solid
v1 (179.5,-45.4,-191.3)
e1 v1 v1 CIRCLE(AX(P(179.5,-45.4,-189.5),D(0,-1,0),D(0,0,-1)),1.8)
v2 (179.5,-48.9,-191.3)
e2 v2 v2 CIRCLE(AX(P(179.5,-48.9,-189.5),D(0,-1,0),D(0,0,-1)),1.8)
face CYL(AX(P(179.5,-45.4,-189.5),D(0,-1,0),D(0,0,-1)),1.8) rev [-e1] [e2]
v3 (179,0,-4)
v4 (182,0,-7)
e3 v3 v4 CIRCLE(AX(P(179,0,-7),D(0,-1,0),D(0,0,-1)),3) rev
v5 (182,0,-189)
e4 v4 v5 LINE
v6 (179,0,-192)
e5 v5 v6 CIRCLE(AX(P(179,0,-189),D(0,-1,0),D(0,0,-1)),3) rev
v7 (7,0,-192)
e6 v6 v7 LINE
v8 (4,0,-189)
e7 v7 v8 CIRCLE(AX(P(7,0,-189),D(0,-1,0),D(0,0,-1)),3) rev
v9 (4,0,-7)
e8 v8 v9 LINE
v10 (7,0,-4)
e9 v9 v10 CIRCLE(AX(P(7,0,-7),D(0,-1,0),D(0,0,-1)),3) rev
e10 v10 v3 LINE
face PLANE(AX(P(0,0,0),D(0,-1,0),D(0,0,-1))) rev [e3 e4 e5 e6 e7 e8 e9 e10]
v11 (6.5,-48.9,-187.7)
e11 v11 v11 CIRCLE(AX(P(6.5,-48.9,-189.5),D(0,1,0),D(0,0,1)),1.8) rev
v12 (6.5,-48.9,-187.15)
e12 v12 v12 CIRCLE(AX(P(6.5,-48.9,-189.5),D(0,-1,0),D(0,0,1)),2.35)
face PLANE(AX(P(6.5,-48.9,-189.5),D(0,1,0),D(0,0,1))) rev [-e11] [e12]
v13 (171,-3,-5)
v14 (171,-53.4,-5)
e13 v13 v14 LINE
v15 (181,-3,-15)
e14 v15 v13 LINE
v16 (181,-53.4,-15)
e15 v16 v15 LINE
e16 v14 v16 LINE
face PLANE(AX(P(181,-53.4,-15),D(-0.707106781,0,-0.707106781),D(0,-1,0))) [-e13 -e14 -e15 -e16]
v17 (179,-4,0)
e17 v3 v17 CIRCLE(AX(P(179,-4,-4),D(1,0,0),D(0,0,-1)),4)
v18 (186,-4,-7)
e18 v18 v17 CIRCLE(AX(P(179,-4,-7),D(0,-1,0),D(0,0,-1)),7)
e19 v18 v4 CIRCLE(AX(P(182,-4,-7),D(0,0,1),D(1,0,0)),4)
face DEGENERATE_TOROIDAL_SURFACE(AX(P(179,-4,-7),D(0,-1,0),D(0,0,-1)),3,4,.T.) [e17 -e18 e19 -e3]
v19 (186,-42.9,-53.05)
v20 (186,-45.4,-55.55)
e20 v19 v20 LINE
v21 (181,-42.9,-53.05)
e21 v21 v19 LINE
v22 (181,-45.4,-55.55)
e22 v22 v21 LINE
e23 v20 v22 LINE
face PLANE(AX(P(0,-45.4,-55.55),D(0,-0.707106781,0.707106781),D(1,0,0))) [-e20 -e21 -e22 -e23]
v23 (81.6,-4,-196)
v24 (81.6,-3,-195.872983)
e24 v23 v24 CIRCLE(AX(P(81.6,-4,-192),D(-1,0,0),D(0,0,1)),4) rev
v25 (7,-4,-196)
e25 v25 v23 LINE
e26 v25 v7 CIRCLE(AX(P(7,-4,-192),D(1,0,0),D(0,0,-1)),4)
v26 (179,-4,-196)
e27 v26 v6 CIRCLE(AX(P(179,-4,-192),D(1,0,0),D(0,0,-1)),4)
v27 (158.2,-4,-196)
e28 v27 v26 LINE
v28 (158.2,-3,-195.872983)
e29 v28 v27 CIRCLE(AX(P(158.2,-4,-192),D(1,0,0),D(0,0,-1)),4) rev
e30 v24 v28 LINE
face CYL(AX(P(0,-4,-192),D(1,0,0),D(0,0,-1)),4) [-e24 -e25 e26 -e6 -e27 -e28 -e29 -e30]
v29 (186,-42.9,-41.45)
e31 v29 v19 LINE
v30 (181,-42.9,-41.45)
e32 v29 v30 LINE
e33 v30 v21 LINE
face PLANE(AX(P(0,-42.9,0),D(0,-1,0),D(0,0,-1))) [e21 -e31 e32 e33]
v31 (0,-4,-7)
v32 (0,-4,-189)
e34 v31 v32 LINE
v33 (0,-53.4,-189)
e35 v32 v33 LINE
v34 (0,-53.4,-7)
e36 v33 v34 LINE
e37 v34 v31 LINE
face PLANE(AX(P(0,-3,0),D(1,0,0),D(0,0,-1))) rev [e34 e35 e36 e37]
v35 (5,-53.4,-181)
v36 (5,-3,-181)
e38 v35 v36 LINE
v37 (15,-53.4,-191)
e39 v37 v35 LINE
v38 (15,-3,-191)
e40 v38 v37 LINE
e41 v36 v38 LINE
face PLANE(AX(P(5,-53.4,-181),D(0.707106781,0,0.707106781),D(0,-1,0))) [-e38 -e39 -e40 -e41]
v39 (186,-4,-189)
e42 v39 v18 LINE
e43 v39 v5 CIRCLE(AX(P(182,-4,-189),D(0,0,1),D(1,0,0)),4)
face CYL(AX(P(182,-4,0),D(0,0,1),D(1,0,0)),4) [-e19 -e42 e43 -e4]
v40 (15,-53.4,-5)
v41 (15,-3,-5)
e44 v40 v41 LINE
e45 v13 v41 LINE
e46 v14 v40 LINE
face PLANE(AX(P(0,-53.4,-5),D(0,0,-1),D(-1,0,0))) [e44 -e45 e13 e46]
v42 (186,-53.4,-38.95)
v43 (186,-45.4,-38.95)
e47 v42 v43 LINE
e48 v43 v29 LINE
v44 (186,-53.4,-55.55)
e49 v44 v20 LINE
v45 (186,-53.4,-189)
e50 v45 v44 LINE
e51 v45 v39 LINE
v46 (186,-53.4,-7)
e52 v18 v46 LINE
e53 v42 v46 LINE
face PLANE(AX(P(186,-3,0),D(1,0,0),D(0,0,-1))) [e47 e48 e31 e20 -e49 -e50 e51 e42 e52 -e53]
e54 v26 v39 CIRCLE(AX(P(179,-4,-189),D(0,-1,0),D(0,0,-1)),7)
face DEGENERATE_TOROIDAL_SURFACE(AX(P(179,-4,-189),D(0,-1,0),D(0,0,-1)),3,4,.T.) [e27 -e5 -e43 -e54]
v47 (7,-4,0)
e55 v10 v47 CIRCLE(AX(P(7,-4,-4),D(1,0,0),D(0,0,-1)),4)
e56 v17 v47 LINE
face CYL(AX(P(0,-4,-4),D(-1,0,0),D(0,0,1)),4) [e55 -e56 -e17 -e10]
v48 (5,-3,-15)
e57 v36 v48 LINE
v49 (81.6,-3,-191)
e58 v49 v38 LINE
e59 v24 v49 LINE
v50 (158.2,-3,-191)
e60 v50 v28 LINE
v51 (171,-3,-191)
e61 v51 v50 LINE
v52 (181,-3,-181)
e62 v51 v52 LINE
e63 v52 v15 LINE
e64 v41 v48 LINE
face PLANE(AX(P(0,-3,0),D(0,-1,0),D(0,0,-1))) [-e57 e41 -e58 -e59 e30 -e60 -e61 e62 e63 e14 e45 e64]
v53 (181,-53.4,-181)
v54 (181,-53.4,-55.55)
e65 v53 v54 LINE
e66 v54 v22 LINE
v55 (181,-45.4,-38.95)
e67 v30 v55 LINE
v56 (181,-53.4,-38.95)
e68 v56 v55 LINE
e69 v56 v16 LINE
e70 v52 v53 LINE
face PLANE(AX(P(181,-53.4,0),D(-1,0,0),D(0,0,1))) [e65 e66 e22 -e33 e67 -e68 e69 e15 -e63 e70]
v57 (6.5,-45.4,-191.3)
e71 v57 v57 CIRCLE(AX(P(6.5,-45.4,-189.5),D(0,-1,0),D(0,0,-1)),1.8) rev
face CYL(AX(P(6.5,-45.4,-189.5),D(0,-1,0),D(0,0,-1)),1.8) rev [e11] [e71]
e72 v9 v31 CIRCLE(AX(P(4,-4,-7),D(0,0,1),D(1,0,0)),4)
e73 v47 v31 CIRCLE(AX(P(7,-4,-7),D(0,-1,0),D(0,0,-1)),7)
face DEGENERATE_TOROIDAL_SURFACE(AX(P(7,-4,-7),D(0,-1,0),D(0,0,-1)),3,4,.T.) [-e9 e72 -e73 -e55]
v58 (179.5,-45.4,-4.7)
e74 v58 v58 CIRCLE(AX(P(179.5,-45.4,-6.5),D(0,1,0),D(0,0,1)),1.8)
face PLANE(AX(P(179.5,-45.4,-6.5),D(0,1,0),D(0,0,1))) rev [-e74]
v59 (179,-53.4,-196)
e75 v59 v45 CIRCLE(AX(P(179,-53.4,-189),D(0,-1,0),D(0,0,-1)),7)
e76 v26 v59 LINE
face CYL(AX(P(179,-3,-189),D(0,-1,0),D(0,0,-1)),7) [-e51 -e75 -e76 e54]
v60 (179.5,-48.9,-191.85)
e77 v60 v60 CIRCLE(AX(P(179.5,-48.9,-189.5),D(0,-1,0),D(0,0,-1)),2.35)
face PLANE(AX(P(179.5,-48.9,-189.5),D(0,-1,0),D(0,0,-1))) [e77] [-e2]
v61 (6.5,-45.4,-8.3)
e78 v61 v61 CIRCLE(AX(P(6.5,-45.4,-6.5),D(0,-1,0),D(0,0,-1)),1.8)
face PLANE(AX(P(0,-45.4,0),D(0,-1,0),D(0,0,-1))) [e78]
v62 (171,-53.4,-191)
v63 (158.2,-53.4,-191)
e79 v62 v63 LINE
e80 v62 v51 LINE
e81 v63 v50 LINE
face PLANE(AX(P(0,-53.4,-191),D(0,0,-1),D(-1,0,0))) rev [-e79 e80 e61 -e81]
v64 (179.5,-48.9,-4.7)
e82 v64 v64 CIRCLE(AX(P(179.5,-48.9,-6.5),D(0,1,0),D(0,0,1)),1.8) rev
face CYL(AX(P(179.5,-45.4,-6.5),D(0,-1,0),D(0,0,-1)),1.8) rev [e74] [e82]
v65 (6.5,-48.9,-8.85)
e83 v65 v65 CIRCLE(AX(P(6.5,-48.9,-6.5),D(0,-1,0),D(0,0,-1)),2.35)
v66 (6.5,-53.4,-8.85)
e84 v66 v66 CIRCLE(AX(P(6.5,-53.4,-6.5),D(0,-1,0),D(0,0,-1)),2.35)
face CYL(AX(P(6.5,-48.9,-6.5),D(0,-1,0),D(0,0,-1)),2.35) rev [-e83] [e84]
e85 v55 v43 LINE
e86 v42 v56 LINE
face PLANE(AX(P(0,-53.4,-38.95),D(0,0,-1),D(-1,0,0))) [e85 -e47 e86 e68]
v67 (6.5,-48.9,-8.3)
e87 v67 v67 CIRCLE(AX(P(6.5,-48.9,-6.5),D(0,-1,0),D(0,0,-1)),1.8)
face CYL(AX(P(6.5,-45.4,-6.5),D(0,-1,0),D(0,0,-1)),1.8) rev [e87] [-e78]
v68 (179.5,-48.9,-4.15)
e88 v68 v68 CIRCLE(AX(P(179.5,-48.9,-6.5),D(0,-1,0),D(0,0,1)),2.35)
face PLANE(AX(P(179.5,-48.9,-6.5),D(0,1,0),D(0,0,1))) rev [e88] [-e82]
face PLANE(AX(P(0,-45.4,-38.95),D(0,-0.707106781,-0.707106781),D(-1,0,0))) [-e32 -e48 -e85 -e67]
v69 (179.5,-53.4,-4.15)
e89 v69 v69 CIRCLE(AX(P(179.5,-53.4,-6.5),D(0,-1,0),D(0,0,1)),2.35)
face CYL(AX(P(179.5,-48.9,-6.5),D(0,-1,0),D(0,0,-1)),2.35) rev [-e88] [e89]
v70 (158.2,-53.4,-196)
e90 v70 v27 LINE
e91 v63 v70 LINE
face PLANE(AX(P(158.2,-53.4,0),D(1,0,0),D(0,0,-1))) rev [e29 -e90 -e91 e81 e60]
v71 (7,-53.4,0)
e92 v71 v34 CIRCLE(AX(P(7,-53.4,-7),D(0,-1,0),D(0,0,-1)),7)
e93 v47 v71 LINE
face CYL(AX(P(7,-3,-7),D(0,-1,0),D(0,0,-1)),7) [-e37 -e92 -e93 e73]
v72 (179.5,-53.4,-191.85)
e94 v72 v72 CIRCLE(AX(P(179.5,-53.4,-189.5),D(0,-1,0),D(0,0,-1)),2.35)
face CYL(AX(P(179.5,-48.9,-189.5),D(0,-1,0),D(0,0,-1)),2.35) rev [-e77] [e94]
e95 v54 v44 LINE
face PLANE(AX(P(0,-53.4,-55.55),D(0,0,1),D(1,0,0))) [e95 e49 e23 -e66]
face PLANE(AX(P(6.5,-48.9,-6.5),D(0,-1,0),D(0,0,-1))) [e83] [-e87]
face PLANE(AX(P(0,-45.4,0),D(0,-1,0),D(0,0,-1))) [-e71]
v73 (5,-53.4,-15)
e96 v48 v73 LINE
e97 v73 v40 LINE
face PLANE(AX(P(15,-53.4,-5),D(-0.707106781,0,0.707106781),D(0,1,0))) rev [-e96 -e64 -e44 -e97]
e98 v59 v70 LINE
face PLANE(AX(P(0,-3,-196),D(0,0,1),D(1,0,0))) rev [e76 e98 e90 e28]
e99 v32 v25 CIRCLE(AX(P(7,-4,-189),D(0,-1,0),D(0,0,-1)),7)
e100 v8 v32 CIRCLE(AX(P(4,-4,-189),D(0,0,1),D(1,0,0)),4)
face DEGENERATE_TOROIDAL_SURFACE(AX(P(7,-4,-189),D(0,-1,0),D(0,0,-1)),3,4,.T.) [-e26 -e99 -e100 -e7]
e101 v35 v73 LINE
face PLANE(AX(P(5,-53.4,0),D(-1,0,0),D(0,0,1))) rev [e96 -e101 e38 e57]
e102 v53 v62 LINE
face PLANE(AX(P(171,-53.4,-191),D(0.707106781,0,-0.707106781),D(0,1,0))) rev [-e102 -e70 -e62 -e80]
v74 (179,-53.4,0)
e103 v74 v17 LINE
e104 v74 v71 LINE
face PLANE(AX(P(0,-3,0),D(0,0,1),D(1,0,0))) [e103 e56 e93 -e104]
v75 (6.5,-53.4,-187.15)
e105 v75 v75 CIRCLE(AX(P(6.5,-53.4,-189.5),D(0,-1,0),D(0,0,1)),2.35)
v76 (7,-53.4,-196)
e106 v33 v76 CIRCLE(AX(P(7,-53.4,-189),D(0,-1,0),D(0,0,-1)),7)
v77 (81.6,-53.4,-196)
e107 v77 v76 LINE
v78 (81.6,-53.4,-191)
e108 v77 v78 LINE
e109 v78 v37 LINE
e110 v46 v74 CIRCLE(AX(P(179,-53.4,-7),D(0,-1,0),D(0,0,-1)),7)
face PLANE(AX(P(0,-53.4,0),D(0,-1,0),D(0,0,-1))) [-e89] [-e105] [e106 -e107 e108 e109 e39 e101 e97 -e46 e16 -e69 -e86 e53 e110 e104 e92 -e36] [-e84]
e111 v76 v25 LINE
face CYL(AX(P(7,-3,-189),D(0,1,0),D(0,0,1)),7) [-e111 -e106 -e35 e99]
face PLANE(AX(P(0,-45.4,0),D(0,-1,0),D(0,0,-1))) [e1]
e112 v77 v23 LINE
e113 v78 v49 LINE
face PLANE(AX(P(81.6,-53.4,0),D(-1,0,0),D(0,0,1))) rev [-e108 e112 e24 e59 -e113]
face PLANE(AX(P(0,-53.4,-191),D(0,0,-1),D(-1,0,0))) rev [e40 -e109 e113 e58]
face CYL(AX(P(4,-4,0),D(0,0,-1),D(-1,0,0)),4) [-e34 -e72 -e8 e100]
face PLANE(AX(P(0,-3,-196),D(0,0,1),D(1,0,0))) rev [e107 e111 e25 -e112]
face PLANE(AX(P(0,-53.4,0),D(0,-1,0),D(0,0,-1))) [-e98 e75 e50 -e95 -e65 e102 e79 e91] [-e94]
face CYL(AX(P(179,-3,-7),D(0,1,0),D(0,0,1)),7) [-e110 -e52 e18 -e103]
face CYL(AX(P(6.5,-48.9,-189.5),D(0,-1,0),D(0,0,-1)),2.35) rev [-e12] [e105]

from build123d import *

# Parameters (mm, degrees)
SKETCH1_W           = 186
SKETCH1_H           = 196
BOSS_EXTRUDE1_DEPTH = 3
BOSS_EXTRUDE2_START = -53.4
BOSS_EXTRUDE2_DEPTH = 50.4
CHAMFER1_SIZE       = 10
SKETCH1_4_W         = 5
SKETCH1_4_H         = 0.8
SKETCH1_4_H_2       = 15
BOSS_EXTRUDE3_DEPTH = 42.9
CHAMFER2_SIZE       = 2.5
SKETCH2_R           = 2.35
SKETCH2_R_2         = 1.8
CUT_EXTRUDE2_DEPTH  = 4.5
SKETCH2_3_R         = 1.8
CUT_EXTRUDE3_DEPTH  = 8
FILLET1_R           = 7
FILLET2_R           = 4


with BuildPart() as part:
    # Sketch1 → Boss-Extrude1 (new body)
    with BuildSketch(Plane(origin=(0, 0, 0), x_dir=(1, 0, 0), z_dir=(0, 1, 0))):
        with Locations((93, 98)):
            Rectangle(SKETCH1_W, SKETCH1_H)
    extrude(amount=-BOSS_EXTRUDE1_DEPTH)

    # Sketch1<3> → Boss-Extrude2 (add)
    with BuildSketch(Plane(origin=(0, 0, 0), x_dir=(1, 0, 0), z_dir=(0, 1, 0)).offset(BOSS_EXTRUDE2_START)):
        Polygon((186, 196), (158.2, 196), (158.2, 191), (181, 191), (181, 55.55), (186, 55.55), align=None)
        Polygon((81.6, 191), (81.6, 196), (0, 196), (0, 0), (186, 0), (186, 38.95), (181, 38.95), (181, 5), (5, 5), (5, 191), align=None)
    extrude(amount=BOSS_EXTRUDE2_DEPTH)

    # Chamfer1
    chamfer1_edges = [part.edges().sort_by_distance(p)[0] for p in [
        (5, -28.2, -191),
        (5, -28.2, -5),
        (181, -28.2, -5),
        (181, -28.2, -191),
    ]]
    chamfer(chamfer1_edges, length=CHAMFER1_SIZE)

    # Sketch1<4> → Boss-Extrude3 (add)
    with BuildSketch(Plane(origin=(0, 0, 0), x_dir=(1, 0, 0), z_dir=(0, 1, 0))):
        with Locations((183.5, 55.15)):
            Rectangle(SKETCH1_4_W, SKETCH1_4_H)
        with Locations((183.5, 47.25)):
            Rectangle(SKETCH1_4_W, SKETCH1_4_H_2)
        with Locations((183.5, 39.35)):
            Rectangle(SKETCH1_4_W, SKETCH1_4_H)
    extrude(amount=-BOSS_EXTRUDE3_DEPTH)

    # Chamfer2
    chamfer2_edges = [part.edges().sort_by_distance(p)[0] for p in [
        (183.5, -42.9, -55.55),
        (183.5, -42.9, -38.95),
    ]]
    chamfer(chamfer2_edges, length=CHAMFER2_SIZE)

    # Sketch2 → Cut-Extrude2 (cut)
    # profile 1 of 4: a face of its own
    with BuildSketch(Plane.XZ.offset(53.4)):
        with Locations(Location((6.5, -6.5, 0), (0, 0, 270))):
            Circle(SKETCH2_R)
        with Locations(Location((6.5, -6.5, 0), (0, 0, 270))):
            Circle(SKETCH2_R_2, mode=Mode.SUBTRACT)
    # profile 2 of 4: a face of its own
    with BuildSketch(Plane.XZ.offset(53.4)):
        with Locations(Location((179.5, -6.5, 0), (0, 0, 90))):
            Circle(SKETCH2_R)
        with Locations(Location((179.5, -6.5, 0), (0, 0, 90))):
            Circle(SKETCH2_R_2, mode=Mode.SUBTRACT)
    # profile 3 of 4: a face of its own
    with BuildSketch(Plane.XZ.offset(53.4)):
        with Locations(Location((179.5, -189.5, 0), (0, 0, 270))):
            Circle(SKETCH2_R)
        with Locations(Location((179.5, -189.5, 0), (0, 0, 270))):
            Circle(SKETCH2_R_2, mode=Mode.SUBTRACT)
    # profile 4 of 4: a face of its own
    with BuildSketch(Plane.XZ.offset(53.4)):
        with Locations(Location((6.5, -189.5, 0), (0, 0, 90))):
            Circle(SKETCH2_R)
        with Locations(Location((6.5, -189.5, 0), (0, 0, 90))):
            Circle(SKETCH2_R_2, mode=Mode.SUBTRACT)
    extrude(amount=-CUT_EXTRUDE2_DEPTH, mode=Mode.SUBTRACT)

    # Sketch2<3> → Cut-Extrude3 (cut)
    with BuildSketch(Plane.XZ.offset(53.4)):
        with Locations(Location((6.5, -6.5, 0), (0, 0, 270))):
            Circle(SKETCH2_3_R)
        with Locations(Location((6.5, -189.5, 0), (0, 0, 270))):
            Circle(SKETCH2_3_R)
        with Locations(Location((179.5, -189.5, 0), (0, 0, 270))):
            Circle(SKETCH2_3_R)
        with Locations(Location((179.5, -6.5, 0), (0, 0, 90))):
            Circle(SKETCH2_3_R)
    extrude(amount=-CUT_EXTRUDE3_DEPTH, mode=Mode.SUBTRACT)

    # Fillet1
    fillet1_edges = [part.edges().sort_by_distance(p)[0] for p in [
        (0, -26.7, 0),
        (186, -26.7, 0),
        (186, -26.7, -196),
        (0, -26.7, -196),
    ]]
    fillet(fillet1_edges, radius=FILLET1_R)

    # Fillet2
    # the kernel refuses this fillet: 4 mm, written as the material it takes off along each edge
    with BuildSketch(Plane(origin=(179, 0, -7), x_dir=(0, 0, 1), z_dir=(-1, 0, 0))) as fillet2_piece_1:
        with BuildLine():
            CenterArc((7 - FILLET2_R, -FILLET2_R), FILLET2_R, 0, 90)
            Line((7, -FILLET2_R), (7, 0))
            Line((7, 0), (7 - FILLET2_R, 0))
        make_face()
    revolve(axis=Axis((179, 0, -7), (0, 1, 0)), revolution_arc=90, mode=Mode.SUBTRACT)
    with BuildSketch(Plane(origin=(7, 0, 0), x_dir=(0, 0, -1), z_dir=(1, 0, 0))) as fillet2_piece_2:
        with BuildLine():
            CenterArc((FILLET2_R, -FILLET2_R), FILLET2_R, 90, 90)
            Line((0, -FILLET2_R), (0, 0))
            Line((0, 0), (FILLET2_R, 0))
        make_face()
    extrude(amount=172, mode=Mode.SUBTRACT)
    with BuildSketch(Plane(origin=(7, 0, -7), x_dir=(0, 0, 1), z_dir=(1, 0, 0))) as fillet2_piece_3:
        with BuildLine():
            CenterArc((7 - FILLET2_R, FILLET2_R), FILLET2_R, 270, 90)
            Line((7, FILLET2_R), (7, 0))
            Line((7, 0), (7 - FILLET2_R, 0))
        make_face()
    revolve(axis=Axis((7, 0, -7), (0, -1, 0)), revolution_arc=90, mode=Mode.SUBTRACT)
    with BuildSketch(Plane(origin=(0, 0, -189), x_dir=(1, 0, 0), z_dir=(0, 0, 1))) as fillet2_piece_4:
        with BuildLine():
            CenterArc((FILLET2_R, -FILLET2_R), FILLET2_R, 90, 90)
            Line((0, -FILLET2_R), (0, 0))
            Line((0, 0), (FILLET2_R, 0))
        make_face()
    extrude(amount=182, mode=Mode.SUBTRACT)
    with BuildSketch(Plane(origin=(7, 0, -189), x_dir=(0, 0, -1), z_dir=(1, 0, 0))) as fillet2_piece_5:
        with BuildLine():
            CenterArc((7 - FILLET2_R, -FILLET2_R), FILLET2_R, 0, 90)
            Line((7, -FILLET2_R), (7, 0))
            Line((7, 0), (7 - FILLET2_R, 0))
        make_face()
    revolve(axis=Axis((7, 0, -189), (0, 1, 0)), revolution_arc=90, mode=Mode.SUBTRACT)
    with BuildSketch(Plane(origin=(179, 0, -196), x_dir=(0, -1, 0), z_dir=(-1, 0, 0))) as fillet2_piece_6:
        with BuildLine():
            CenterArc((FILLET2_R, FILLET2_R), FILLET2_R, 180, 90)
            Line((0, FILLET2_R), (0, 0))
            Line((0, 0), (FILLET2_R, 0))
        make_face()
    extrude(amount=172, mode=Mode.SUBTRACT)
    with BuildSketch(Plane(origin=(179, 0, -189), x_dir=(0, 0, -1), z_dir=(-1, 0, 0))) as fillet2_piece_7:
        with BuildLine():
            CenterArc((7 - FILLET2_R, FILLET2_R), FILLET2_R, 270, 90)
            Line((7 - FILLET2_R, 0), (7, 0))
            Line((7, 0), (7, FILLET2_R))
        make_face()
    revolve(axis=Axis((179, 0, -189), (0, -1, 0)), revolution_arc=90, mode=Mode.SUBTRACT)
    with BuildSketch(Plane(origin=(186, 0, -189), x_dir=(-1, 0, 0), z_dir=(0, 0, 1))) as fillet2_piece_8:
        with BuildLine():
            CenterArc((FILLET2_R, FILLET2_R), FILLET2_R, 180, 90)
            Line((0, FILLET2_R), (0, 0))
            Line((0, 0), (FILLET2_R, 0))
        make_face()
    extrude(amount=182, mode=Mode.SUBTRACT)


solid = part.part
